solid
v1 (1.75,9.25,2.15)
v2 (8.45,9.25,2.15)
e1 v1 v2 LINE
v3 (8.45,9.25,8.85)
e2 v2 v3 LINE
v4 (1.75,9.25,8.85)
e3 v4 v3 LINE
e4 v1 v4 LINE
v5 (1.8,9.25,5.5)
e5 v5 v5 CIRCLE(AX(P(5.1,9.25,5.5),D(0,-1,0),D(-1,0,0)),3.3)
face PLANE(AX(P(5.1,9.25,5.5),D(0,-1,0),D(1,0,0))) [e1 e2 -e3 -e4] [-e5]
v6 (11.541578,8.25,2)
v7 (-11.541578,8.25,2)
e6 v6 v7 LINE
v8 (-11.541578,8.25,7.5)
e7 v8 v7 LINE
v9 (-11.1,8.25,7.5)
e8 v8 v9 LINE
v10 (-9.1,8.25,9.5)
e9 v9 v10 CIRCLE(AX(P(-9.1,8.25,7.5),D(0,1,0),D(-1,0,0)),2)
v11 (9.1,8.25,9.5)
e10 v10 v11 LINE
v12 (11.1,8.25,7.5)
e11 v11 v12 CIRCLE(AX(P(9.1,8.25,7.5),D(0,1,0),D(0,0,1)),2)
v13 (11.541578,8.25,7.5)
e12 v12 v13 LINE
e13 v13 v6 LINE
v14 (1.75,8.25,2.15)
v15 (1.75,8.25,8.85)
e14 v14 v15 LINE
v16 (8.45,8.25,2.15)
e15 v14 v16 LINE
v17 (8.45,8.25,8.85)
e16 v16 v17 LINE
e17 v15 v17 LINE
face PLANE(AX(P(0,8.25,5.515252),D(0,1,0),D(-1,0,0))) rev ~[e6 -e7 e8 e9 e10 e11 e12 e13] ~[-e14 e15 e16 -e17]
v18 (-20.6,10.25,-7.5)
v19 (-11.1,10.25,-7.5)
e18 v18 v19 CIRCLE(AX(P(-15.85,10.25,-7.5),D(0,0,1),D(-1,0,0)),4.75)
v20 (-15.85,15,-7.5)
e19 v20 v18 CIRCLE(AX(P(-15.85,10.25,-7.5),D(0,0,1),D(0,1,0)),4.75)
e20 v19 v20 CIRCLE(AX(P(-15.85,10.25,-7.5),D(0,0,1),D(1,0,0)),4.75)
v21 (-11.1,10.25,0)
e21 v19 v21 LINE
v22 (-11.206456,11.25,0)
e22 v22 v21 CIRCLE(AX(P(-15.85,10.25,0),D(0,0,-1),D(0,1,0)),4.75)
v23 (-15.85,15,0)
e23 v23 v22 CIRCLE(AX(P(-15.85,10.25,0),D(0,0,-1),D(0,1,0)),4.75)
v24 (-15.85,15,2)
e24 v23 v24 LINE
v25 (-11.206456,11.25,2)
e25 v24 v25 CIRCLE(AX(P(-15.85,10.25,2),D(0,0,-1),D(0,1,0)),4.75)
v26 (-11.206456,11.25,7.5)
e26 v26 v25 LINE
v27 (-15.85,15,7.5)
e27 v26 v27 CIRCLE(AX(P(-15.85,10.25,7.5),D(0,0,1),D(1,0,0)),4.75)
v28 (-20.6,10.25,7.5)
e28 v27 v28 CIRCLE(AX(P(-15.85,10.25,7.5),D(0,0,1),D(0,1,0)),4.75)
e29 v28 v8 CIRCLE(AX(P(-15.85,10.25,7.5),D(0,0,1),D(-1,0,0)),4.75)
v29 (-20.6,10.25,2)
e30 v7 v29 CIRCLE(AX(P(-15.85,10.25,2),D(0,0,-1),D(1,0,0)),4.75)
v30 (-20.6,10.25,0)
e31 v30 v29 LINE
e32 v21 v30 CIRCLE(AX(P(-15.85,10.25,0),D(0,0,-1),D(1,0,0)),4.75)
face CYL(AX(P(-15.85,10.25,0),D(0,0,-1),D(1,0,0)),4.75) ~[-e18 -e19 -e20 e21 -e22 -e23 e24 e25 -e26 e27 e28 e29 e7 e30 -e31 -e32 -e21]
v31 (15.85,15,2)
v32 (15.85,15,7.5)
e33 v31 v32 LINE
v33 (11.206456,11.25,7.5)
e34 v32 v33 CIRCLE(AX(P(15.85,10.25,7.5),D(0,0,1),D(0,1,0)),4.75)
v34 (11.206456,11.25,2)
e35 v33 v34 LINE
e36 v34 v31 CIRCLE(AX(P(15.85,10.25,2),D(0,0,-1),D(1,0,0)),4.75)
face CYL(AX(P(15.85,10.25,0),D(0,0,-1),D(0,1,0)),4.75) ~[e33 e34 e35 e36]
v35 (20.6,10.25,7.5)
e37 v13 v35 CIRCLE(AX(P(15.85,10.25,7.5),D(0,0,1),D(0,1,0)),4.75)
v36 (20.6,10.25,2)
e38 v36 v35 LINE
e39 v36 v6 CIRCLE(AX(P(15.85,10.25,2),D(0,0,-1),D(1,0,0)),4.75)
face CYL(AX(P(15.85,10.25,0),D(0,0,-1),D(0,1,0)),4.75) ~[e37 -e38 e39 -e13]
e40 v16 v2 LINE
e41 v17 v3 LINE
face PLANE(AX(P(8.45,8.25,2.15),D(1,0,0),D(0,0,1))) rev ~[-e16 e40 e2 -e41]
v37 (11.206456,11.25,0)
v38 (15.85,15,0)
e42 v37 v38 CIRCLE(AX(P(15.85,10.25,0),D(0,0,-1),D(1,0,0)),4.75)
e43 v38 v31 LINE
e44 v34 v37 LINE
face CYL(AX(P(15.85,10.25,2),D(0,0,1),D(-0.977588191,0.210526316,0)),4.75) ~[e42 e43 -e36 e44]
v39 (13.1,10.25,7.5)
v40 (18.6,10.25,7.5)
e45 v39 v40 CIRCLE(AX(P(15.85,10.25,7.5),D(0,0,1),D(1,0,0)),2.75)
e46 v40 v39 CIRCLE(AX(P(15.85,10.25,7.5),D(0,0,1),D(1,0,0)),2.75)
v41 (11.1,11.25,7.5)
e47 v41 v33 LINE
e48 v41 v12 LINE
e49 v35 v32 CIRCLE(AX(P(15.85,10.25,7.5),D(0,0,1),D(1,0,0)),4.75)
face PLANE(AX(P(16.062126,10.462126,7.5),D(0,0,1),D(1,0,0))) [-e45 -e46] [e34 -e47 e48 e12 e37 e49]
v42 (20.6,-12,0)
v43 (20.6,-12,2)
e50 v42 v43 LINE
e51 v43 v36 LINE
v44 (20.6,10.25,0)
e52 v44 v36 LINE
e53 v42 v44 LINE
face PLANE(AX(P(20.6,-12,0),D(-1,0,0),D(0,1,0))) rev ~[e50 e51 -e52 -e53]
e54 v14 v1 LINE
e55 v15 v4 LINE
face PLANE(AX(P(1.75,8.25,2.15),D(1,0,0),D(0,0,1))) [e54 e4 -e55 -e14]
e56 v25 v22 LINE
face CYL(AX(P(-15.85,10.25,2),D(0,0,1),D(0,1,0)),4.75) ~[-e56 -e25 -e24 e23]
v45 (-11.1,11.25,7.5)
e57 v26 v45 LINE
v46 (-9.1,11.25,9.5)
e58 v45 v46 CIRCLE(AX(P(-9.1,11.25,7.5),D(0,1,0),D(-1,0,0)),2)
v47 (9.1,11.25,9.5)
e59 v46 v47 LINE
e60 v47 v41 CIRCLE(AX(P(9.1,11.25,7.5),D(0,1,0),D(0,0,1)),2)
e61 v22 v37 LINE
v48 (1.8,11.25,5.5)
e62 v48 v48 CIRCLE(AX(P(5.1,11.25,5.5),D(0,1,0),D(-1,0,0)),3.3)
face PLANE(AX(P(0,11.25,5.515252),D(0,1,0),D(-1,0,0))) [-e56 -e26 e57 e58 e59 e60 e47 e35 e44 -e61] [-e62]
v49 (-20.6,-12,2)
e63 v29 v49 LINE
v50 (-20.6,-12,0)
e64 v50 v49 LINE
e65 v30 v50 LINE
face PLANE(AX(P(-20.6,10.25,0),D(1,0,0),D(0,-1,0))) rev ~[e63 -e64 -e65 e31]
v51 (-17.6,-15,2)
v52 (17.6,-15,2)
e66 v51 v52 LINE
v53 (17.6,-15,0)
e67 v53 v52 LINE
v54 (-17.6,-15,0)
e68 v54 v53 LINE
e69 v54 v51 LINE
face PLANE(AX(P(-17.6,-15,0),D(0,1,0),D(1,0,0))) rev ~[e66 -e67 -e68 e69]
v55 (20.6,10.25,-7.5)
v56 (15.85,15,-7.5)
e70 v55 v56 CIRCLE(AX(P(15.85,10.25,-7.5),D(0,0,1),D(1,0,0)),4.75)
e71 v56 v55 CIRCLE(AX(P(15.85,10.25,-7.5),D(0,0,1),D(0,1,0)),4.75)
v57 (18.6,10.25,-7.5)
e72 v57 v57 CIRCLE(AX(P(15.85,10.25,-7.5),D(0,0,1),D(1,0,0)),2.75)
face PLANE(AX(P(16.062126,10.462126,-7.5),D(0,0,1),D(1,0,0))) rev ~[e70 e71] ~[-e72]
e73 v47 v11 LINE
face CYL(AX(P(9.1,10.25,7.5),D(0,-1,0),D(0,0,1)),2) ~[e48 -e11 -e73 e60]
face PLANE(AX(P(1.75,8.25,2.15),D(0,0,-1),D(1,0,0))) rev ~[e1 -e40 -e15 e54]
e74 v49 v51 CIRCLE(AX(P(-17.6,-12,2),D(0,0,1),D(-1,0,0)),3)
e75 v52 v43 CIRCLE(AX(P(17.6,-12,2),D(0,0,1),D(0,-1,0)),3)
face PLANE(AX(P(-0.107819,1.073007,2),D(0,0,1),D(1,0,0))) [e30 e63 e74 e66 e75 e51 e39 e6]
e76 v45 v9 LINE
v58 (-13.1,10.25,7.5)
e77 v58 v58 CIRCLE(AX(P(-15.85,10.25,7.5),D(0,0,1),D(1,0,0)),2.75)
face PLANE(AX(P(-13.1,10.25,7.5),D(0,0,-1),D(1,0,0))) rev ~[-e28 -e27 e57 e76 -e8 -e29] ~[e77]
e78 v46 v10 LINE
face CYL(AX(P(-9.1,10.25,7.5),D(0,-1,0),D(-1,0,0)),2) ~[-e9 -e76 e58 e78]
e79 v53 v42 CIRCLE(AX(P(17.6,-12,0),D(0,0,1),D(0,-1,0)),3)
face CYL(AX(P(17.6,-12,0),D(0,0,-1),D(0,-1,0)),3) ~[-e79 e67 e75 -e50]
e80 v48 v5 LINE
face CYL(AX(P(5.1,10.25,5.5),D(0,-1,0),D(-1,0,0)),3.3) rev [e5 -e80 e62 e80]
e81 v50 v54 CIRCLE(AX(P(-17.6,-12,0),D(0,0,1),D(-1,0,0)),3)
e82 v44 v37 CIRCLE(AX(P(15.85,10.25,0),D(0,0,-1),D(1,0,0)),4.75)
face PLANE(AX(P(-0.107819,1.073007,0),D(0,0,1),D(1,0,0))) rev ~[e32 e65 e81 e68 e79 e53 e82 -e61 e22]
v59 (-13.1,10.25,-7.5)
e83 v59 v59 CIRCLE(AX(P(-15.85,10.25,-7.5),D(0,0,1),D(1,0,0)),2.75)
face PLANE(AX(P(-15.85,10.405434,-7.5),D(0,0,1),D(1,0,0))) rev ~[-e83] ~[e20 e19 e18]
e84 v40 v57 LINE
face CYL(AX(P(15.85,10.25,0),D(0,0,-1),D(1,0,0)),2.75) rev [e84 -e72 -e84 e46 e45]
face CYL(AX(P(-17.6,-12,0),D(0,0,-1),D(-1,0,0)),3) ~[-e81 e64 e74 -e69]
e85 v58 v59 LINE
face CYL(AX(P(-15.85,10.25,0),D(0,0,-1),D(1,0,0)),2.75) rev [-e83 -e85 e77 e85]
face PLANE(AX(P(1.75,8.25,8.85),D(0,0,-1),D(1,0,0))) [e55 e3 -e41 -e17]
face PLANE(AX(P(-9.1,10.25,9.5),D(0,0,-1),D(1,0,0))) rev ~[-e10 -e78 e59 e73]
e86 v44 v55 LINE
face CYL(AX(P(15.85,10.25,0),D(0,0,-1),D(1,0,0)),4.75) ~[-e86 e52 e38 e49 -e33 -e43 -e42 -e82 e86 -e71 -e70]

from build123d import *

# Parameters (mm, degrees)
F1_DEPTH      = 2
F0_R          = 2.75
F2_DEPTH      = 7.5
F4_R          = 3.3
F5_DEPTH      = 1
F5_DEPTH_BACK = 2
F7_DEPTH      = 2
F8_W          = 6.7
F8_H          = 6.7
F8_R          = 3.3
F9_DEPTH      = 1


# Not quite as in the source:
# - after a boolean that leaves OpenCascade's solid faulty, fix() repairs it


with BuildPart() as f1:
    # F0 (on Top) → F1 (new body)
    with BuildSketch(Plane.XY):
        with BuildLine():
            ThreePointArc((20.6, 10.25), (12.4912427894, 6.8912427894), (15.85, 15))
            Line((15.85, 15), (-15.85, 15))
            ThreePointArc((-15.85, 15), (-12.4912427894, 13.6087572106), (-11.1, 10.25))
            ThreePointArc((-11.1, 10.25), (-15.85, 5.5), (-20.6, 10.25))
            Line((-20.6, 10.25), (-20.6, -12))
            ThreePointArc((-20.6, -12), (-19.7213203436, -14.1213203436), (-17.6, -15))
            Line((-17.6, -15), (17.6, -15))
            ThreePointArc((17.6, -15), (19.7213203436, -14.1213203436), (20.6, -12))
            Line((20.6, -12), (20.6, 10.25))
        make_face()
    extrude(amount=F1_DEPTH)

    # F0 (on Top) → F2 (join, symmetric)
    with BuildSketch(Plane.XY):
        with BuildLine():
            ThreePointArc((-11.1, 10.25), (-12.4912427894, 13.6087572106), (-15.85, 15))
            ThreePointArc((-15.85, 15), (-19.2087572106, 13.6087572106), (-20.6, 10.25))
            ThreePointArc((-20.6, 10.25), (-15.85, 5.5), (-11.1, 10.25))
        make_face()
        with Locations((-15.85, 10.25)):
            Circle(F0_R, mode=Mode.SUBTRACT)
        with BuildLine():
            ThreePointArc((20.6, 10.25), (19.2087572106, 13.6087572106), (15.85, 15))
            ThreePointArc((15.85, 15), (12.4912427894, 6.8912427894), (20.6, 10.25))
        make_face()
        with Locations((15.85, 10.25)):
            Circle(F0_R, mode=Mode.SUBTRACT)
    extrude(amount=F2_DEPTH, both=True)

    # F4 (on line) → F5 (join, two sides)
    with BuildSketch(Plane(origin=(0, 10.25, 0), x_dir=(-1, 0, 0), z_dir=(0, 1, 0))) as f5_sk:
        with BuildLine():
            Line((-13.1, 7.5), (-13.1, 2))
            Line((-13.1, 2), (-11.1, 2))
            Line((-11.1, 2), (11.1, 2))
            Line((11.1, 2), (13.1, 2))
            Line((13.1, 2), (13.1, 7.5))
            Line((13.1, 7.5), (11.1, 7.5))
            ThreePointArc((11.1, 7.5), (10.5142135624, 8.9142135624), (9.1, 9.5))
            Line((9.1, 9.5), (-9.1, 9.5))
            ThreePointArc((-9.1, 9.5), (-10.5142135624, 8.9142135624), (-11.1, 7.5))
            Line((-11.1, 7.5), (-13.1, 7.5))
        make_face()
        with Locations((-5.1, 5.5)):
            Circle(F4_R, mode=Mode.SUBTRACT)
    extrude(amount=F5_DEPTH)
    extrude(f5_sk.sketch, amount=-F5_DEPTH_BACK)

    # F6 (on face) → F7 (cut, through all)
    with BuildSketch(Plane.XY.offset(2)):
        with BuildLine():
            ThreePointArc((-15.85, 15), (-12.8656659034, 13.9454363748), (-11.2064560947, 11.25))
            Line((-11.2064560947, 11.25), (11.2064560947, 11.25))
            ThreePointArc((11.2064560947, 11.25), (12.8656659034, 13.9454363748), (15.85, 15))
            Line((15.85, 15), (-15.85, 15))
        make_face()
    extrude(amount=-F7_DEPTH, mode=Mode.SUBTRACT)

    # F8 (on face) → F9 (cut)
    with BuildSketch(Plane.XZ.offset(-8.25)):
        with Locations((5.1, 5.5)):
            Rectangle(F8_W, F8_H)
        with Locations((5.1, 5.5)):
            Circle(F8_R, mode=Mode.SUBTRACT)
        with Locations((5.1, 5.5)):
            Circle(F8_R)
    extrude(amount=-F9_DEPTH, mode=Mode.SUBTRACT)

    add(f1.part.fix(), mode=Mode.REPLACE)


solid = f1.part
